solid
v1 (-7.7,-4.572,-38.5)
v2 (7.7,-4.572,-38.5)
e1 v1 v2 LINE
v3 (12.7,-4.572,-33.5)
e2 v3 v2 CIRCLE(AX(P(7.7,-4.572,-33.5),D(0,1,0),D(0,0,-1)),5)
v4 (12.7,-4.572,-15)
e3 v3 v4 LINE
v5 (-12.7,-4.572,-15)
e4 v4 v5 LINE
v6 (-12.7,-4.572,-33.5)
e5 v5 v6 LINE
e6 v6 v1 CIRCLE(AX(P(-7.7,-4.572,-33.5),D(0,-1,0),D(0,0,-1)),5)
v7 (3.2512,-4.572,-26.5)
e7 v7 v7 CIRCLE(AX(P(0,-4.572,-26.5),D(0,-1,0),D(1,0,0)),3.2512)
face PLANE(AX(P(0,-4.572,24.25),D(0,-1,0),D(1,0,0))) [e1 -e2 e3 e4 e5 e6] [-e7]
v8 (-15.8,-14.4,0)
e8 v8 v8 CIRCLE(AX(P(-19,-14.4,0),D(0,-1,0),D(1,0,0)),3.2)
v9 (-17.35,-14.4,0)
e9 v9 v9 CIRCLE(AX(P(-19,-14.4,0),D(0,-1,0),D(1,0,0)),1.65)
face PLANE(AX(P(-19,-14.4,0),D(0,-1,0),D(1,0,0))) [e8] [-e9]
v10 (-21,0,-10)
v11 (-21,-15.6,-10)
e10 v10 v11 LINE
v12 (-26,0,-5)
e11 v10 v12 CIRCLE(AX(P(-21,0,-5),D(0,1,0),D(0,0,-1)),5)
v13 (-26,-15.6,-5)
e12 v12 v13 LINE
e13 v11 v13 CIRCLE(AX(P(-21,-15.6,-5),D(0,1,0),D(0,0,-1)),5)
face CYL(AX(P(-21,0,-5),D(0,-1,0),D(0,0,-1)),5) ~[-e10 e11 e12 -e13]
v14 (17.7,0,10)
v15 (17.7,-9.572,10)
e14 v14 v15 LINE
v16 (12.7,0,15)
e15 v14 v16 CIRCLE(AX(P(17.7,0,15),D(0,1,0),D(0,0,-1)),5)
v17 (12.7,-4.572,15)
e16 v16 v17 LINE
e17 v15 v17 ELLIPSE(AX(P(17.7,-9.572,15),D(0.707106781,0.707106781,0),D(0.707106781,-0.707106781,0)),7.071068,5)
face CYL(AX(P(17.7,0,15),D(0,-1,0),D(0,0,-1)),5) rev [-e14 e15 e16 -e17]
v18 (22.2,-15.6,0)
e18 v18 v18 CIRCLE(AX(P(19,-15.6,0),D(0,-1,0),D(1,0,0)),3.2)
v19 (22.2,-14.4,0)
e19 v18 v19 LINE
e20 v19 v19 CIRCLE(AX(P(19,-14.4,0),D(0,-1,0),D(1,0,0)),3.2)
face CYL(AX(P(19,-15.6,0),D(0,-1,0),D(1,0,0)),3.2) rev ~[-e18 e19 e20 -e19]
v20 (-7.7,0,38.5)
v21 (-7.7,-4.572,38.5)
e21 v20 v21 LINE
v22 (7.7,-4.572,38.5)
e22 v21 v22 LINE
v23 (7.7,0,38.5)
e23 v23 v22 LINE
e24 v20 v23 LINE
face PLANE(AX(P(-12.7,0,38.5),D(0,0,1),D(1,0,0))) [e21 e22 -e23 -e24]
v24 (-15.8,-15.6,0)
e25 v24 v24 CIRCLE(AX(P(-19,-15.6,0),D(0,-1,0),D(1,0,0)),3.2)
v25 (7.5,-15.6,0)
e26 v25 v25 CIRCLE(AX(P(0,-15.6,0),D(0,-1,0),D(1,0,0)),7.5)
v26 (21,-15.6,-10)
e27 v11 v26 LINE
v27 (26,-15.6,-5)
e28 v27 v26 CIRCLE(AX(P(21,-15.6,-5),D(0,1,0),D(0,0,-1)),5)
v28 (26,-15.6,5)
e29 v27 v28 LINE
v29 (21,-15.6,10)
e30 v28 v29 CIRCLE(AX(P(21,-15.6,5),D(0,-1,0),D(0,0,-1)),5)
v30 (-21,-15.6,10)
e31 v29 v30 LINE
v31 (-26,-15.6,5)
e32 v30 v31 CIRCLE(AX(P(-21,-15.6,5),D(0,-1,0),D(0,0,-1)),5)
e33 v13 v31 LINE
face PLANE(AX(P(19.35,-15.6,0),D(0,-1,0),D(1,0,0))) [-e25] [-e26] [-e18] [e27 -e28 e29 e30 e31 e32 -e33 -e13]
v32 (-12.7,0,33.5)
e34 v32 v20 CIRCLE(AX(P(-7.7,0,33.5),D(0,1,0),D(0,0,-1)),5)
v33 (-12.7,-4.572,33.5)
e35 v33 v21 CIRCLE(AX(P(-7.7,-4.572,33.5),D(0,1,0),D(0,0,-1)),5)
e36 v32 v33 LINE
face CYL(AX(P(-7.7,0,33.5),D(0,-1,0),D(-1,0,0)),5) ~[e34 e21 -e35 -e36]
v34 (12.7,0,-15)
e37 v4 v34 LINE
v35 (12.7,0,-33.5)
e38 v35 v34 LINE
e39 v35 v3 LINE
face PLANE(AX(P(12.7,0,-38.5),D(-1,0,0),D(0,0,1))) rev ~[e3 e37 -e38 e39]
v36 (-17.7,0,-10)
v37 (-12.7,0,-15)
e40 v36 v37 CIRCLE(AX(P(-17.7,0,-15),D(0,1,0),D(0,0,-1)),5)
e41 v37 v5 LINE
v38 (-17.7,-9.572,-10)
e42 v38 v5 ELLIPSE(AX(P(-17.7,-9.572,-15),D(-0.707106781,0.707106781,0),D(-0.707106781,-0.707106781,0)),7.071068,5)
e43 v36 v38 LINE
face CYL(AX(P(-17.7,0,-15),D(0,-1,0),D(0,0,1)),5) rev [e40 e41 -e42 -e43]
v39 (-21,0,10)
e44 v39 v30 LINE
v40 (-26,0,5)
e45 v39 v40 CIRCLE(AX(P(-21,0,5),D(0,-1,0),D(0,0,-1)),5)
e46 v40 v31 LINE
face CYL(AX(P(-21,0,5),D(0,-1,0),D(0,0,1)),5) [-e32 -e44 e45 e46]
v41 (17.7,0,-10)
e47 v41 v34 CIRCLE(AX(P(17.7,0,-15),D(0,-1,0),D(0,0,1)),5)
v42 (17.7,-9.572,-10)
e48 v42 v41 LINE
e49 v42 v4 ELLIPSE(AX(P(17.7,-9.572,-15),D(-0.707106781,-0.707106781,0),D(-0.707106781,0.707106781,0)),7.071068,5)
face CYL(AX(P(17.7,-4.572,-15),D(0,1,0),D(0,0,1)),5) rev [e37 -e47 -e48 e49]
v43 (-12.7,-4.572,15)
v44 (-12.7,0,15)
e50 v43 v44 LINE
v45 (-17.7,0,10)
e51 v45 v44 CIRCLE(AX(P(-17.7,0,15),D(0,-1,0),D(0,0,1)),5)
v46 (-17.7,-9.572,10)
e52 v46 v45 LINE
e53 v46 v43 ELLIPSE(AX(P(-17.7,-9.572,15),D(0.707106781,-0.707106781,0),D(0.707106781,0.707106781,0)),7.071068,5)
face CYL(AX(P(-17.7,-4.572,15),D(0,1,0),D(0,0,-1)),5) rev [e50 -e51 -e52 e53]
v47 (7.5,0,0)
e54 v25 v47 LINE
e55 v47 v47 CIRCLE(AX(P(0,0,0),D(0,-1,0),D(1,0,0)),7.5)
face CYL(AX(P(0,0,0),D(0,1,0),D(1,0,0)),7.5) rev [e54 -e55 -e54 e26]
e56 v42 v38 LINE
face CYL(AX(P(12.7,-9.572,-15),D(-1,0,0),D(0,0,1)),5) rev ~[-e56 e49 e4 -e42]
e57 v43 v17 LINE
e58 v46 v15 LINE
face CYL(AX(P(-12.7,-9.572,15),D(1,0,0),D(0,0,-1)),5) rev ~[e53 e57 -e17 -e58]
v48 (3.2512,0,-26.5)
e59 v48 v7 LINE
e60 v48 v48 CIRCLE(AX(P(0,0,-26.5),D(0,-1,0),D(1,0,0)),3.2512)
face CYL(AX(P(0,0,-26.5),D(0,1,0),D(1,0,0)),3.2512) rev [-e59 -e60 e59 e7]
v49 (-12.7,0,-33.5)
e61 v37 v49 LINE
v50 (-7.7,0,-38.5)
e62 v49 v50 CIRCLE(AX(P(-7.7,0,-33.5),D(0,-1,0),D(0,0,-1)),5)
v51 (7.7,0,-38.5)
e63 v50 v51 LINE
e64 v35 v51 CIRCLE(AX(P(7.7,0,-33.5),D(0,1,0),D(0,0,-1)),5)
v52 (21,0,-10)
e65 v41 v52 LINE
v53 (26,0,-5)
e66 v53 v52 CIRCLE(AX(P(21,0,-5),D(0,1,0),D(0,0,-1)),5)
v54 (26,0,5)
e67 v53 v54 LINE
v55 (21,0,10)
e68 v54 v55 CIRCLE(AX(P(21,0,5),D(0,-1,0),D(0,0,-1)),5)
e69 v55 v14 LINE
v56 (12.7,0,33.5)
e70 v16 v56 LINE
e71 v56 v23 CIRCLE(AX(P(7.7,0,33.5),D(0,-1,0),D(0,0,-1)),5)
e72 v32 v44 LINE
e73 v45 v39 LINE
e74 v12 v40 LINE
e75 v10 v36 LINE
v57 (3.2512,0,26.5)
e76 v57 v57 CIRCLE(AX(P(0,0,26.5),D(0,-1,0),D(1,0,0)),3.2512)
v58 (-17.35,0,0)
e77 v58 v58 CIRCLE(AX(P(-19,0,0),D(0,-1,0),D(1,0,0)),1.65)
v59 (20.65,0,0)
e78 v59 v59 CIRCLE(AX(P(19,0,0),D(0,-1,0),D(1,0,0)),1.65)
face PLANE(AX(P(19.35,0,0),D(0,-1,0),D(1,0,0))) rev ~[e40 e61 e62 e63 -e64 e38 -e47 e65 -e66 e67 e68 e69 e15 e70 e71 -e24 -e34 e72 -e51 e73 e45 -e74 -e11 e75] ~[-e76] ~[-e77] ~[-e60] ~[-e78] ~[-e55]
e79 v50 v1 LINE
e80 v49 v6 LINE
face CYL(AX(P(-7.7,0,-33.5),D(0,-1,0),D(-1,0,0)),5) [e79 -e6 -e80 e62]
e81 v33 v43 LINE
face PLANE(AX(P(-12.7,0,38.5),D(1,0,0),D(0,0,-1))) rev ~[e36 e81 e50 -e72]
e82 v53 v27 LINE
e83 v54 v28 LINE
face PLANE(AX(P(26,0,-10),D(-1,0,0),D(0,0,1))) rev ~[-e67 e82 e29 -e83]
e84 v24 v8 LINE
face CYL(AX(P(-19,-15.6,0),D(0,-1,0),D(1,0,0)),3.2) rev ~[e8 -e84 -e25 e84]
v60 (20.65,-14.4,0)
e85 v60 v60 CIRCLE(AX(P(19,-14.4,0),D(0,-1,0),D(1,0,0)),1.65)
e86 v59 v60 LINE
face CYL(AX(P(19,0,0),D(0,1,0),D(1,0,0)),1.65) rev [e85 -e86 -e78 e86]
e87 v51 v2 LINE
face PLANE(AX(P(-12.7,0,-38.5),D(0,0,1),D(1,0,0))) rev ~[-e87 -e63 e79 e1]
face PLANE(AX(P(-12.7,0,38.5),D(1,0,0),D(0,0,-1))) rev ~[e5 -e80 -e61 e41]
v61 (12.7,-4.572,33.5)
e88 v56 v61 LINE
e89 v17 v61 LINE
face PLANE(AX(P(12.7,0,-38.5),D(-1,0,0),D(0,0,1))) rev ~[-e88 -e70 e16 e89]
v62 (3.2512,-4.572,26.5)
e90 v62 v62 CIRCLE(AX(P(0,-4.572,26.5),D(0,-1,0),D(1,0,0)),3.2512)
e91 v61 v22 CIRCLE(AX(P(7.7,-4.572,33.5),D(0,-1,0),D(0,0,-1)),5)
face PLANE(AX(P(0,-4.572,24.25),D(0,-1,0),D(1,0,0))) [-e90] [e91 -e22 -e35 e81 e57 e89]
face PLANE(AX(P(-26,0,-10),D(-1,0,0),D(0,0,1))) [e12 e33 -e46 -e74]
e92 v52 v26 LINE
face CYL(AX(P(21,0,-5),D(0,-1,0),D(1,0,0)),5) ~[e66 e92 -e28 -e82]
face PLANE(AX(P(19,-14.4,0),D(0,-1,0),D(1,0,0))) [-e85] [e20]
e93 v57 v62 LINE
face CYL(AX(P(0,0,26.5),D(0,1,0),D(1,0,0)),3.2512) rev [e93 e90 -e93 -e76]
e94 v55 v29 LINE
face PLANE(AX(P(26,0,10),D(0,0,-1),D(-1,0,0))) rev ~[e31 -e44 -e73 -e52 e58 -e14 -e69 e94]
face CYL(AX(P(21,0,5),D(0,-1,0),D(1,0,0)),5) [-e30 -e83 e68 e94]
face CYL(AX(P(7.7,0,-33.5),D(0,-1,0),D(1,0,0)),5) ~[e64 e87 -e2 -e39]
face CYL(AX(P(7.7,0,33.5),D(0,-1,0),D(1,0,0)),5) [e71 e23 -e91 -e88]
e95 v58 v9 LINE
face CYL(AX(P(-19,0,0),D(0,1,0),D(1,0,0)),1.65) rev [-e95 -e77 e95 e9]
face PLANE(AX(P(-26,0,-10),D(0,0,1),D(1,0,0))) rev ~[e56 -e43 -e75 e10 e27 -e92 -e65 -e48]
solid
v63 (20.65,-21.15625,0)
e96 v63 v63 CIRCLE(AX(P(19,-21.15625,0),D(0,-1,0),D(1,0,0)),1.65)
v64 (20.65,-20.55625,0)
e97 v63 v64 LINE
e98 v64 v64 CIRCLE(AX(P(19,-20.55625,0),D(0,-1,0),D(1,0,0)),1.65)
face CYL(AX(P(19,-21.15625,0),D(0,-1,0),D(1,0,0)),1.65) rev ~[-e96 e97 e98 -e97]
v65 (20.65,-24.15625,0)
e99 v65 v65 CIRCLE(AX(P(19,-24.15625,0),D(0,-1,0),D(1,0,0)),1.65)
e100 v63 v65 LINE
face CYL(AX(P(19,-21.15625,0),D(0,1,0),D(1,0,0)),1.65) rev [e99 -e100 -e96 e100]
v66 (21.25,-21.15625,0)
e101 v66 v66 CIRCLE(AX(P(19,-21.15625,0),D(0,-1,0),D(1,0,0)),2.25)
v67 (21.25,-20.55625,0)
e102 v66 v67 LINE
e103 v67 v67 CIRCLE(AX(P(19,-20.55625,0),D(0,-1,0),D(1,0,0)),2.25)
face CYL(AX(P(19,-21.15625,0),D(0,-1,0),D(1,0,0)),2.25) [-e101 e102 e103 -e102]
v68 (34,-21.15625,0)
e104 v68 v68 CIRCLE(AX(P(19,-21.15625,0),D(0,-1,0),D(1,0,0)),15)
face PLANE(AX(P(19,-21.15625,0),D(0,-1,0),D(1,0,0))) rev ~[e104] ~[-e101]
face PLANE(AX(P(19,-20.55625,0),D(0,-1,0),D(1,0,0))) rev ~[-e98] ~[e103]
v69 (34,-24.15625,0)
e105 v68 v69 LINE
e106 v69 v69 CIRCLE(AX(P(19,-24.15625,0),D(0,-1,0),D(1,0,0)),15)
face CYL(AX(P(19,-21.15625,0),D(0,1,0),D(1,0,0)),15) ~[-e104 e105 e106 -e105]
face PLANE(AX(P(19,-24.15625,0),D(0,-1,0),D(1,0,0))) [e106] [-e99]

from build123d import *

# Parameters (mm, degrees)
F0_W     = 25.4
F0_H     = 28.5
F0_R     = 3.2512
F0_H_2   = 20
F0_R_2   = 7.5
F1_DEPTH = 4.572
F0_W_2   = 13.3
F0_R_3   = 1.65
F2_DEPTH = 15.6
F3_R     = 3.2
F3_R_2   = 1.65
F4_DEPTH = 1.2
F5_R     = 5
F7_R     = 15
F7_R_2   = 2.25
F7_R_3   = 1.65
F8_DEPTH = 3
F9_DEPTH = 0.6


# Not quite as in the source:
# - a length typed as a fraction of an inch, garbled in the dataset ("3 / 203.2 mm" for 3/8 in), is restored


with BuildPart() as f1:
    # F0 (on Front) → F1 (new body)
    with BuildSketch(Plane.XZ):
        with Locations((0, 24.25)):
            Rectangle(F0_W, F0_H)
        with Locations((0, 26.5)):
            Circle(F0_R, mode=Mode.SUBTRACT)
        with Locations((0, -24.25)):
            Rectangle(F0_W, F0_H)
        with Locations((0, -26.5)):
            Circle(F0_R, mode=Mode.SUBTRACT)
        Rectangle(F0_W, F0_H_2)
        Circle(F0_R_2, mode=Mode.SUBTRACT)
    extrude(amount=F1_DEPTH)

    # F0 (on Front) → F2 (join)
    with BuildSketch(Plane.XZ):
        with Locations((19.35, 0)):
            Rectangle(F0_W_2, F0_H_2)
        with Locations((19, 0)):
            Circle(F0_R_3, mode=Mode.SUBTRACT)
        with Locations((-19.35, 0)):
            Rectangle(F0_W_2, F0_H_2)
        with Locations((-19, 0)):
            Circle(F0_R_3, mode=Mode.SUBTRACT)
        Rectangle(F0_W, F0_H_2)
        Circle(F0_R_2, mode=Mode.SUBTRACT)
    extrude(amount=F2_DEPTH)

    # F3 (on face) → F4 (cut)
    with BuildSketch(Plane.XZ.offset(15.6)):
        with Locations((-19, 0)):
            Circle(F3_R)
        with Locations((-19, 0)):
            Circle(F3_R_2, mode=Mode.SUBTRACT)
        with Locations((19, 0)):
            Circle(F3_R)
        with Locations((19, 0)):
            Circle(F3_R_2, mode=Mode.SUBTRACT)
    extrude(amount=-F4_DEPTH, mode=Mode.SUBTRACT)

    # F5
    f5_edges = [f1.edges().sort_by_distance(p)[0] for p in [
        (0, -4.572, 10),
        (0, -4.572, -10),
        (26, -7.8, -10),
        (-26, -7.8, -10),
        (-26, -7.8, 10),
        (26, -7.8, 10),
        (-12.7, -2.286, 10),
        (12.7, -2.286, 10),
        (12.7, -2.286, -10),
        (-12.7, -2.286, -10),
        (12.7, -2.286, 38.5),
        (-12.7, -2.286, 38.5),
        (12.7, -2.286, -38.5),
        (-12.7, -2.286, -38.5),
    ]]
    fillet(f5_edges, radius=F5_R)


with BuildPart() as f8:
    # F7 (on offset) → F8 (new body)
    with BuildSketch(Plane.XZ.offset(21.15625)):
        with Locations((19, 0)):
            Circle(F7_R)
        with Locations((19, 0)):
            Circle(F7_R_2, mode=Mode.SUBTRACT)
        with Locations((19, 0)):
            Circle(F7_R_2)
        with Locations((19, 0)):
            Circle(F7_R_3, mode=Mode.SUBTRACT)
    extrude(amount=F8_DEPTH)

    # F7 (on offset) → F9 (join)
    with BuildSketch(Plane.XZ.offset(21.15625)):
        with Locations((19, 0)):
            Circle(F7_R_2)
        with Locations((19, 0)):
            Circle(F7_R_3, mode=Mode.SUBTRACT)
    extrude(amount=-F9_DEPTH)


solid = Compound([f1.part, f8.part])
